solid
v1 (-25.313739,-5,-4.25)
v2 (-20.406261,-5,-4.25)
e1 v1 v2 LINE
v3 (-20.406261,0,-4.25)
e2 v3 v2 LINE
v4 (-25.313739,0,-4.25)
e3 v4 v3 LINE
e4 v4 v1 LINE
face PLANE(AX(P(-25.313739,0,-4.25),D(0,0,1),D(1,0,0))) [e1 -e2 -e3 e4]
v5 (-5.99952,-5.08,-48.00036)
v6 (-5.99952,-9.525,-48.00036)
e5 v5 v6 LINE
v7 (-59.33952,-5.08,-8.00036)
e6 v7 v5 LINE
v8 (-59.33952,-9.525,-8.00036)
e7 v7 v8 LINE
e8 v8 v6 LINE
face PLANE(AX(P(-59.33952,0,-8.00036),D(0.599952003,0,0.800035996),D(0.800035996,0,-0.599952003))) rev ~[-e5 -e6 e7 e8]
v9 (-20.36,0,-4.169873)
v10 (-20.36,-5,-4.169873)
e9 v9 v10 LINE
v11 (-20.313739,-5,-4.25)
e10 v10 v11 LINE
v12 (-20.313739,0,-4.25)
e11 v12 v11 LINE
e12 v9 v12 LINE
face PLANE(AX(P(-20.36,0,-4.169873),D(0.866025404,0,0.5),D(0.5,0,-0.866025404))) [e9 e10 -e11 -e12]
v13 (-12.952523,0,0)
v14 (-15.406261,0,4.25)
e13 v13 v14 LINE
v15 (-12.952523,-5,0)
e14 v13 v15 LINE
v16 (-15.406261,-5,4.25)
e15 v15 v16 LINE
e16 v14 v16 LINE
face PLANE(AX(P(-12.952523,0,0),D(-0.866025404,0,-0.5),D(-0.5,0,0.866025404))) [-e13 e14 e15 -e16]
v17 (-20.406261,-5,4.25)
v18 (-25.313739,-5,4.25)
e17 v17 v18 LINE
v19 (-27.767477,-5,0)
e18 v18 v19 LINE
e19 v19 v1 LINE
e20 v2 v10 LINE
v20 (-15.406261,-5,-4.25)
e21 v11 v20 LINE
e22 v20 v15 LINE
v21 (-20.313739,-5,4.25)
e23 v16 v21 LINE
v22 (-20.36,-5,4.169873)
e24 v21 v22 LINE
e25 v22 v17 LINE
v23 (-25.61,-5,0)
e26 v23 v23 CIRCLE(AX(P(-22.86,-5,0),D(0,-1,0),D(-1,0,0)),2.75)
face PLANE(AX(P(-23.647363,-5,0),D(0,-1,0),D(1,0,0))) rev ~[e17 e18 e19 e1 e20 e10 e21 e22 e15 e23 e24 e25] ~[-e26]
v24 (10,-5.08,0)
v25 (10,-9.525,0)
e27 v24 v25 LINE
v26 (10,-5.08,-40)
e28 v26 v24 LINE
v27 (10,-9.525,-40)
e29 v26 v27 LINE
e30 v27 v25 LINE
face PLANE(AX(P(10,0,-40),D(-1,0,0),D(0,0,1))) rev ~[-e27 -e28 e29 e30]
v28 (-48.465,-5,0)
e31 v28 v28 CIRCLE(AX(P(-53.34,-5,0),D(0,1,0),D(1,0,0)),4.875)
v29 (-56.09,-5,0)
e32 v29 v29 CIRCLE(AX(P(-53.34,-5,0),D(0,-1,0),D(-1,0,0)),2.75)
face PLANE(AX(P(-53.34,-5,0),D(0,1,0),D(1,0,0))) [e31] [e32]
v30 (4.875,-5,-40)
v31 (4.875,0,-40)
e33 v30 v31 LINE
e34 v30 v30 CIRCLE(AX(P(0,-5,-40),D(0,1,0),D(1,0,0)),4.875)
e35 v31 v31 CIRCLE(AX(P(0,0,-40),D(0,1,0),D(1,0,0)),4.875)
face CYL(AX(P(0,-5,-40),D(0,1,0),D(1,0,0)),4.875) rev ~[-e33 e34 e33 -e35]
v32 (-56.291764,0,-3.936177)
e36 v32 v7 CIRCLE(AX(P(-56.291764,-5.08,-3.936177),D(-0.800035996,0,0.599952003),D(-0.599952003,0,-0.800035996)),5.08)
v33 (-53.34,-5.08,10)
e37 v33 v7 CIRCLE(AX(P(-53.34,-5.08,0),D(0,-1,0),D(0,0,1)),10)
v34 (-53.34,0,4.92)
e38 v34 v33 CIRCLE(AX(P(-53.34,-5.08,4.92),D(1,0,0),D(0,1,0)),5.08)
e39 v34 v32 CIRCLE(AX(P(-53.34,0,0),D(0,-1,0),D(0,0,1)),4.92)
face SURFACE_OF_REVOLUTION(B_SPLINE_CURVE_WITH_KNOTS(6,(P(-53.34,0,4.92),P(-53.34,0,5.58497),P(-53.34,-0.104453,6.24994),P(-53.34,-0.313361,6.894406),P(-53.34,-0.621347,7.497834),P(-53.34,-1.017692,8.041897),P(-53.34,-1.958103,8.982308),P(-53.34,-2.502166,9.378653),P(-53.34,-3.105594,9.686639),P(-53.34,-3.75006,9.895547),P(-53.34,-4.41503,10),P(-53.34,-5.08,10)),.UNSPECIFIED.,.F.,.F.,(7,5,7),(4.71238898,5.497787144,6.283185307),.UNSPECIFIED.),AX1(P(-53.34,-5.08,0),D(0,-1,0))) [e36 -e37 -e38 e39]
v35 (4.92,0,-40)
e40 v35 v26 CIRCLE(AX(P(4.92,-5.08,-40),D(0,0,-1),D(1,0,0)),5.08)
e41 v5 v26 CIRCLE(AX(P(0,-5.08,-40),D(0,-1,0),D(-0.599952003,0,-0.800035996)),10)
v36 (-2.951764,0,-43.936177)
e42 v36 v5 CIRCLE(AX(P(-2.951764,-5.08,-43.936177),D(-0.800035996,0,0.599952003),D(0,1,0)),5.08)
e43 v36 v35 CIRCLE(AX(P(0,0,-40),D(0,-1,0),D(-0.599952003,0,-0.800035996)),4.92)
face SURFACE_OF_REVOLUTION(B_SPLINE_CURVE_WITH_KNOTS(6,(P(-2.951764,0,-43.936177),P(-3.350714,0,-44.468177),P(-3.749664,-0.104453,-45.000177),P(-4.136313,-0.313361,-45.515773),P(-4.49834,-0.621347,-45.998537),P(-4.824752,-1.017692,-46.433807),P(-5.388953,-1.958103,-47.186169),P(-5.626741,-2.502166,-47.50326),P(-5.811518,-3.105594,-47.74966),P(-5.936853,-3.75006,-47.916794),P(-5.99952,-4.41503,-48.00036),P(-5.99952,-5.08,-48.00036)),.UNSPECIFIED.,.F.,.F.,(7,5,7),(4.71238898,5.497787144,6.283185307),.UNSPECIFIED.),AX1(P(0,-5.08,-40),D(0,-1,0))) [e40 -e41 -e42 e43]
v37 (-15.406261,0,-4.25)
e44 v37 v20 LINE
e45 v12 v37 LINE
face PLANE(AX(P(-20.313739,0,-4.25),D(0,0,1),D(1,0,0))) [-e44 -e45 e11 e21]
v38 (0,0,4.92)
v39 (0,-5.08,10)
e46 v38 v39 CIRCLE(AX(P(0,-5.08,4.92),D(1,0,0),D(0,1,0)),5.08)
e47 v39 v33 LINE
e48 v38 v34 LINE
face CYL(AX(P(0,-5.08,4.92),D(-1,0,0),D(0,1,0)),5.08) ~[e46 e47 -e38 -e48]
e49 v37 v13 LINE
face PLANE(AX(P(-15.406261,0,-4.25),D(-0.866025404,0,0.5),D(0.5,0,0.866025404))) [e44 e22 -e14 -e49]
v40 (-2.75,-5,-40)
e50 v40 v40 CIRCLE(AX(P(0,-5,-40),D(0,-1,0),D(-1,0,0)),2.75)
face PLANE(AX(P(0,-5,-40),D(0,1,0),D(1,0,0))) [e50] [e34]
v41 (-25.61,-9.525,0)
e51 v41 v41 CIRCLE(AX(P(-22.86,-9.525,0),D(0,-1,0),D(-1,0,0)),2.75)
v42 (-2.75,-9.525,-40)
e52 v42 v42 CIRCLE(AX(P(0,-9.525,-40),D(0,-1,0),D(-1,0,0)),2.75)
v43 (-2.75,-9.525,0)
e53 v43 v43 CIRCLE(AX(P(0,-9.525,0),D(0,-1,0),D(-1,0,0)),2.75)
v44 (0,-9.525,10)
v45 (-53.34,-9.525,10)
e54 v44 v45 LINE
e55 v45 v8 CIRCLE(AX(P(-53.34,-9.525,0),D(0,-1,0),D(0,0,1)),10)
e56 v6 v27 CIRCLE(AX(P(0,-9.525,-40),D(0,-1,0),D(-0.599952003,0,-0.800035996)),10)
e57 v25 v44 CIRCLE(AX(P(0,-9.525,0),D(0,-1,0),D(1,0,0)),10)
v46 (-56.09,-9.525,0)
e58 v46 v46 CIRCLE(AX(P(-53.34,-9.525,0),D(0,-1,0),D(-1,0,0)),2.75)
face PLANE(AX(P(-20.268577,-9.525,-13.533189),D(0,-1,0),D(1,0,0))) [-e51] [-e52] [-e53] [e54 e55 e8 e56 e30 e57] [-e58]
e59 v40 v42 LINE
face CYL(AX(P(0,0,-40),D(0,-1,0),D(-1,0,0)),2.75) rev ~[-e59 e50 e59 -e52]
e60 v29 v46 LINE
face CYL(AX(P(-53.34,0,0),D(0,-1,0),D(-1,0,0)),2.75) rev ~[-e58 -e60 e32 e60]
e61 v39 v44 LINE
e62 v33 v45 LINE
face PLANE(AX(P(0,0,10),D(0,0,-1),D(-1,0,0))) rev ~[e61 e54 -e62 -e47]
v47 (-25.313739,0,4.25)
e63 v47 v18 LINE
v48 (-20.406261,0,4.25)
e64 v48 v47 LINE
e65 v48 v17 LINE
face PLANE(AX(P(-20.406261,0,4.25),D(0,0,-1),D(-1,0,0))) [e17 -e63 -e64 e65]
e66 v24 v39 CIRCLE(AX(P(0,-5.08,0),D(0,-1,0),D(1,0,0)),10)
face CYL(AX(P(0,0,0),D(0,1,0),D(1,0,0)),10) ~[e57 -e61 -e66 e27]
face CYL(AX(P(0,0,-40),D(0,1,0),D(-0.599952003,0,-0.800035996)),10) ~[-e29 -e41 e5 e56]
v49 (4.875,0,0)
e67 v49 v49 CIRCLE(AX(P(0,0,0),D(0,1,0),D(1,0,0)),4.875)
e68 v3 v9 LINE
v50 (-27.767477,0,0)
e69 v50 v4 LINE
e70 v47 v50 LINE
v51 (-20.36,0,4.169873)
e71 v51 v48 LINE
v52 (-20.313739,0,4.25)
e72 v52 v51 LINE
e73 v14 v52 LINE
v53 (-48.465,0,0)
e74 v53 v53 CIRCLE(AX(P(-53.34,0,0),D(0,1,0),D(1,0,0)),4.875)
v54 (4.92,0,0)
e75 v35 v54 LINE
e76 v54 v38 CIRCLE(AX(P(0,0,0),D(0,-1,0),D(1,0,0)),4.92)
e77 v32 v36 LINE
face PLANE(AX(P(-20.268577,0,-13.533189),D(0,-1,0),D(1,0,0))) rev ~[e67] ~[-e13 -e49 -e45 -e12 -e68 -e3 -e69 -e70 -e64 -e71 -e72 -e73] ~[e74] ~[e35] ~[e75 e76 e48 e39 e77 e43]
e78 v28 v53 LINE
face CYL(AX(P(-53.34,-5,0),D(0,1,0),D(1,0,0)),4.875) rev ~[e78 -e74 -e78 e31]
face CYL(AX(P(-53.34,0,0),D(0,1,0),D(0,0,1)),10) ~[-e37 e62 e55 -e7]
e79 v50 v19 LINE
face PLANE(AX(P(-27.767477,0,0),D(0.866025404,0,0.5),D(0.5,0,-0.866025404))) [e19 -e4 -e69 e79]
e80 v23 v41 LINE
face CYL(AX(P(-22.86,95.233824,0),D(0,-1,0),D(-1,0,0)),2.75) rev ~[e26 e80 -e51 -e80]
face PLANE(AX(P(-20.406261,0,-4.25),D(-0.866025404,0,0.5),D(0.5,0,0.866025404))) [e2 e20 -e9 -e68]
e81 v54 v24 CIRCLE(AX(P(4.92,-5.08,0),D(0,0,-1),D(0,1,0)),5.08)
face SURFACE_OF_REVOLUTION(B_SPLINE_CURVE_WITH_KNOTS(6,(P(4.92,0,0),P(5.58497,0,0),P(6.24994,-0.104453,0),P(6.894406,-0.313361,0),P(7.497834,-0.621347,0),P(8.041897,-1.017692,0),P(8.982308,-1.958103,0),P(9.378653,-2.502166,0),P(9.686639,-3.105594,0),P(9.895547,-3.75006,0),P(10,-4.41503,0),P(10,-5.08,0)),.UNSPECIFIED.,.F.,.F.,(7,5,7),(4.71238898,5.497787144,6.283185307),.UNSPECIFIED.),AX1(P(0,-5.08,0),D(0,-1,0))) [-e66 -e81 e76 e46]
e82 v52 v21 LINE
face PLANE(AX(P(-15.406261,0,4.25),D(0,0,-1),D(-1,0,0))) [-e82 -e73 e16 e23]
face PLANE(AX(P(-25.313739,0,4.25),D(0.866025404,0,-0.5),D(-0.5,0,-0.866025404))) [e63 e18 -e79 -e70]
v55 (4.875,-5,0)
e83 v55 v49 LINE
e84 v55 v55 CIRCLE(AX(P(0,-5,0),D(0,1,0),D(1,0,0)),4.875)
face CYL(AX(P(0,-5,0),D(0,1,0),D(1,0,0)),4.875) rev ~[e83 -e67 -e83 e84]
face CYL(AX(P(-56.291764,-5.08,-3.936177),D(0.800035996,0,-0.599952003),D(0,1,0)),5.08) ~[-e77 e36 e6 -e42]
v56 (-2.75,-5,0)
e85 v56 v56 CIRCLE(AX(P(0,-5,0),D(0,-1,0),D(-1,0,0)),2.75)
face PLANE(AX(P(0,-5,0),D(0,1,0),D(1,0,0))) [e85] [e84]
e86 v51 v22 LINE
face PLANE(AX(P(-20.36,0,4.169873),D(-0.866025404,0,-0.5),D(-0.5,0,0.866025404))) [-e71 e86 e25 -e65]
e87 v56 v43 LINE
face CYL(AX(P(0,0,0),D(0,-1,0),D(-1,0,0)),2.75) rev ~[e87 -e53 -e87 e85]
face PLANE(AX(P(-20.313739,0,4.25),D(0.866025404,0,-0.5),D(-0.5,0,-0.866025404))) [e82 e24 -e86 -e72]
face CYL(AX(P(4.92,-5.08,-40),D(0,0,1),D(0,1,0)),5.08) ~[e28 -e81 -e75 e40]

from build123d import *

# Parameters (mm, degrees)
F1_DEPTH       = 9.525
F2_D           = 5.5
F2_CBORE_D     = 9.75
F2_CBORE_DEPTH = 5
F3_R           = 5.08
F4_DEPTH       = 5
F5_D           = 5.5


# Not quite as in the source:
# - a feature names something its author has since deleted; it is built from what else it names


with BuildPart() as f1:
    # F0 (on Front) → F1 (new body)
    with BuildSketch(Plane.XZ):
        with BuildLine():
            Line((10, -40), (10, 0))
            ThreePointArc((10, 0), (7.0710678119, 7.0710678119), (0, 10))
            Line((0, 10), (-53.34, 10))
            ThreePointArc((-53.34, 10), (-62.826927837, 3.1619930765), (-59.3395200276, -8.0003599568))
            Line((-59.3395200276, -8.0003599568), (-5.9995200276, -48.0003599568))
            ThreePointArc((-5.9995200276, -48.0003599568), (4.4724042597, -48.9441377526), (10, -40))
        make_face()
        Polygon((-20.36, -4.1698729811), (-20.4062613559, -4.25), (-25.3137386441, -4.25), (-27.7674772881, 0), (-25.3137386441, 4.25), (-20.4062613559, 4.25), (-20.36, 4.1698729811), (-20.3137386441, 4.25), (-15.4062613559, 4.25), (-12.9525227119, 0), (-15.4062613559, -4.25), (-20.3137386441, -4.25), align=None, mode=Mode.SUBTRACT)
        Polygon((-25.3137386441, -4.25), (-20.4062613559, -4.25), (-20.36, -4.1698729811), (-22.7674772881, 0), (-20.36, 4.1698729811), (-20.4062613559, 4.25), (-25.3137386441, 4.25), (-27.7674772881, 0), align=None)
        Polygon((-17.9525227119, 0), (-20.36, -4.1698729811), (-20.3137386441, -4.25), (-15.4062613559, -4.25), (-12.9525227119, 0), (-15.4062613559, 4.25), (-20.3137386441, 4.25), (-20.36, 4.1698729811), align=None)
        Polygon((-22.7674772881, 0), (-20.36, -4.1698729811), (-17.9525227119, 0), (-20.36, 4.1698729811), align=None)
    extrude(amount=F1_DEPTH)

    # F2 (through all)
    with Locations(Plane(origin=(0, 0, 0), x_dir=(1, 0, 0), z_dir=(0, 1, 0))):
        with Locations((0, 0), (0, 40), (-53.34, 0)):
            CounterBoreHole(F2_D / 2, F2_CBORE_D / 2, F2_CBORE_DEPTH)

    # F3
    f3_edges = [f1.edges().sort_by_distance(p)[0] for p in [
        (-26.67, 0, 10),
    ]]
    fillet(f3_edges, radius=F3_R)

    # F0 (on Front) → F4 (cut)
    with BuildSketch(Plane.XZ):
        Polygon((-25.3137386441, -4.25), (-20.4062613559, -4.25), (-20.36, -4.1698729811), (-22.7674772881, 0), (-20.36, 4.1698729811), (-20.4062613559, 4.25), (-25.3137386441, 4.25), (-27.7674772881, 0), align=None)
        Polygon((-22.7674772881, 0), (-20.36, -4.1698729811), (-17.9525227119, 0), (-20.36, 4.1698729811), align=None)
        Polygon((-17.9525227119, 0), (-20.36, -4.1698729811), (-20.3137386441, -4.25), (-15.4062613559, -4.25), (-12.9525227119, 0), (-15.4062613559, 4.25), (-20.3137386441, 4.25), (-20.36, 4.1698729811), align=None)
    extrude(amount=F4_DEPTH, mode=Mode.SUBTRACT)

    # F5 (through all)
    with Locations(Plane(origin=(0, 0, 0), x_dir=(1, 0, 0), z_dir=(0, 1, 0))):
        with Locations((-22.86, 0)):
            Hole(F5_D / 2)


solid = f1.part
